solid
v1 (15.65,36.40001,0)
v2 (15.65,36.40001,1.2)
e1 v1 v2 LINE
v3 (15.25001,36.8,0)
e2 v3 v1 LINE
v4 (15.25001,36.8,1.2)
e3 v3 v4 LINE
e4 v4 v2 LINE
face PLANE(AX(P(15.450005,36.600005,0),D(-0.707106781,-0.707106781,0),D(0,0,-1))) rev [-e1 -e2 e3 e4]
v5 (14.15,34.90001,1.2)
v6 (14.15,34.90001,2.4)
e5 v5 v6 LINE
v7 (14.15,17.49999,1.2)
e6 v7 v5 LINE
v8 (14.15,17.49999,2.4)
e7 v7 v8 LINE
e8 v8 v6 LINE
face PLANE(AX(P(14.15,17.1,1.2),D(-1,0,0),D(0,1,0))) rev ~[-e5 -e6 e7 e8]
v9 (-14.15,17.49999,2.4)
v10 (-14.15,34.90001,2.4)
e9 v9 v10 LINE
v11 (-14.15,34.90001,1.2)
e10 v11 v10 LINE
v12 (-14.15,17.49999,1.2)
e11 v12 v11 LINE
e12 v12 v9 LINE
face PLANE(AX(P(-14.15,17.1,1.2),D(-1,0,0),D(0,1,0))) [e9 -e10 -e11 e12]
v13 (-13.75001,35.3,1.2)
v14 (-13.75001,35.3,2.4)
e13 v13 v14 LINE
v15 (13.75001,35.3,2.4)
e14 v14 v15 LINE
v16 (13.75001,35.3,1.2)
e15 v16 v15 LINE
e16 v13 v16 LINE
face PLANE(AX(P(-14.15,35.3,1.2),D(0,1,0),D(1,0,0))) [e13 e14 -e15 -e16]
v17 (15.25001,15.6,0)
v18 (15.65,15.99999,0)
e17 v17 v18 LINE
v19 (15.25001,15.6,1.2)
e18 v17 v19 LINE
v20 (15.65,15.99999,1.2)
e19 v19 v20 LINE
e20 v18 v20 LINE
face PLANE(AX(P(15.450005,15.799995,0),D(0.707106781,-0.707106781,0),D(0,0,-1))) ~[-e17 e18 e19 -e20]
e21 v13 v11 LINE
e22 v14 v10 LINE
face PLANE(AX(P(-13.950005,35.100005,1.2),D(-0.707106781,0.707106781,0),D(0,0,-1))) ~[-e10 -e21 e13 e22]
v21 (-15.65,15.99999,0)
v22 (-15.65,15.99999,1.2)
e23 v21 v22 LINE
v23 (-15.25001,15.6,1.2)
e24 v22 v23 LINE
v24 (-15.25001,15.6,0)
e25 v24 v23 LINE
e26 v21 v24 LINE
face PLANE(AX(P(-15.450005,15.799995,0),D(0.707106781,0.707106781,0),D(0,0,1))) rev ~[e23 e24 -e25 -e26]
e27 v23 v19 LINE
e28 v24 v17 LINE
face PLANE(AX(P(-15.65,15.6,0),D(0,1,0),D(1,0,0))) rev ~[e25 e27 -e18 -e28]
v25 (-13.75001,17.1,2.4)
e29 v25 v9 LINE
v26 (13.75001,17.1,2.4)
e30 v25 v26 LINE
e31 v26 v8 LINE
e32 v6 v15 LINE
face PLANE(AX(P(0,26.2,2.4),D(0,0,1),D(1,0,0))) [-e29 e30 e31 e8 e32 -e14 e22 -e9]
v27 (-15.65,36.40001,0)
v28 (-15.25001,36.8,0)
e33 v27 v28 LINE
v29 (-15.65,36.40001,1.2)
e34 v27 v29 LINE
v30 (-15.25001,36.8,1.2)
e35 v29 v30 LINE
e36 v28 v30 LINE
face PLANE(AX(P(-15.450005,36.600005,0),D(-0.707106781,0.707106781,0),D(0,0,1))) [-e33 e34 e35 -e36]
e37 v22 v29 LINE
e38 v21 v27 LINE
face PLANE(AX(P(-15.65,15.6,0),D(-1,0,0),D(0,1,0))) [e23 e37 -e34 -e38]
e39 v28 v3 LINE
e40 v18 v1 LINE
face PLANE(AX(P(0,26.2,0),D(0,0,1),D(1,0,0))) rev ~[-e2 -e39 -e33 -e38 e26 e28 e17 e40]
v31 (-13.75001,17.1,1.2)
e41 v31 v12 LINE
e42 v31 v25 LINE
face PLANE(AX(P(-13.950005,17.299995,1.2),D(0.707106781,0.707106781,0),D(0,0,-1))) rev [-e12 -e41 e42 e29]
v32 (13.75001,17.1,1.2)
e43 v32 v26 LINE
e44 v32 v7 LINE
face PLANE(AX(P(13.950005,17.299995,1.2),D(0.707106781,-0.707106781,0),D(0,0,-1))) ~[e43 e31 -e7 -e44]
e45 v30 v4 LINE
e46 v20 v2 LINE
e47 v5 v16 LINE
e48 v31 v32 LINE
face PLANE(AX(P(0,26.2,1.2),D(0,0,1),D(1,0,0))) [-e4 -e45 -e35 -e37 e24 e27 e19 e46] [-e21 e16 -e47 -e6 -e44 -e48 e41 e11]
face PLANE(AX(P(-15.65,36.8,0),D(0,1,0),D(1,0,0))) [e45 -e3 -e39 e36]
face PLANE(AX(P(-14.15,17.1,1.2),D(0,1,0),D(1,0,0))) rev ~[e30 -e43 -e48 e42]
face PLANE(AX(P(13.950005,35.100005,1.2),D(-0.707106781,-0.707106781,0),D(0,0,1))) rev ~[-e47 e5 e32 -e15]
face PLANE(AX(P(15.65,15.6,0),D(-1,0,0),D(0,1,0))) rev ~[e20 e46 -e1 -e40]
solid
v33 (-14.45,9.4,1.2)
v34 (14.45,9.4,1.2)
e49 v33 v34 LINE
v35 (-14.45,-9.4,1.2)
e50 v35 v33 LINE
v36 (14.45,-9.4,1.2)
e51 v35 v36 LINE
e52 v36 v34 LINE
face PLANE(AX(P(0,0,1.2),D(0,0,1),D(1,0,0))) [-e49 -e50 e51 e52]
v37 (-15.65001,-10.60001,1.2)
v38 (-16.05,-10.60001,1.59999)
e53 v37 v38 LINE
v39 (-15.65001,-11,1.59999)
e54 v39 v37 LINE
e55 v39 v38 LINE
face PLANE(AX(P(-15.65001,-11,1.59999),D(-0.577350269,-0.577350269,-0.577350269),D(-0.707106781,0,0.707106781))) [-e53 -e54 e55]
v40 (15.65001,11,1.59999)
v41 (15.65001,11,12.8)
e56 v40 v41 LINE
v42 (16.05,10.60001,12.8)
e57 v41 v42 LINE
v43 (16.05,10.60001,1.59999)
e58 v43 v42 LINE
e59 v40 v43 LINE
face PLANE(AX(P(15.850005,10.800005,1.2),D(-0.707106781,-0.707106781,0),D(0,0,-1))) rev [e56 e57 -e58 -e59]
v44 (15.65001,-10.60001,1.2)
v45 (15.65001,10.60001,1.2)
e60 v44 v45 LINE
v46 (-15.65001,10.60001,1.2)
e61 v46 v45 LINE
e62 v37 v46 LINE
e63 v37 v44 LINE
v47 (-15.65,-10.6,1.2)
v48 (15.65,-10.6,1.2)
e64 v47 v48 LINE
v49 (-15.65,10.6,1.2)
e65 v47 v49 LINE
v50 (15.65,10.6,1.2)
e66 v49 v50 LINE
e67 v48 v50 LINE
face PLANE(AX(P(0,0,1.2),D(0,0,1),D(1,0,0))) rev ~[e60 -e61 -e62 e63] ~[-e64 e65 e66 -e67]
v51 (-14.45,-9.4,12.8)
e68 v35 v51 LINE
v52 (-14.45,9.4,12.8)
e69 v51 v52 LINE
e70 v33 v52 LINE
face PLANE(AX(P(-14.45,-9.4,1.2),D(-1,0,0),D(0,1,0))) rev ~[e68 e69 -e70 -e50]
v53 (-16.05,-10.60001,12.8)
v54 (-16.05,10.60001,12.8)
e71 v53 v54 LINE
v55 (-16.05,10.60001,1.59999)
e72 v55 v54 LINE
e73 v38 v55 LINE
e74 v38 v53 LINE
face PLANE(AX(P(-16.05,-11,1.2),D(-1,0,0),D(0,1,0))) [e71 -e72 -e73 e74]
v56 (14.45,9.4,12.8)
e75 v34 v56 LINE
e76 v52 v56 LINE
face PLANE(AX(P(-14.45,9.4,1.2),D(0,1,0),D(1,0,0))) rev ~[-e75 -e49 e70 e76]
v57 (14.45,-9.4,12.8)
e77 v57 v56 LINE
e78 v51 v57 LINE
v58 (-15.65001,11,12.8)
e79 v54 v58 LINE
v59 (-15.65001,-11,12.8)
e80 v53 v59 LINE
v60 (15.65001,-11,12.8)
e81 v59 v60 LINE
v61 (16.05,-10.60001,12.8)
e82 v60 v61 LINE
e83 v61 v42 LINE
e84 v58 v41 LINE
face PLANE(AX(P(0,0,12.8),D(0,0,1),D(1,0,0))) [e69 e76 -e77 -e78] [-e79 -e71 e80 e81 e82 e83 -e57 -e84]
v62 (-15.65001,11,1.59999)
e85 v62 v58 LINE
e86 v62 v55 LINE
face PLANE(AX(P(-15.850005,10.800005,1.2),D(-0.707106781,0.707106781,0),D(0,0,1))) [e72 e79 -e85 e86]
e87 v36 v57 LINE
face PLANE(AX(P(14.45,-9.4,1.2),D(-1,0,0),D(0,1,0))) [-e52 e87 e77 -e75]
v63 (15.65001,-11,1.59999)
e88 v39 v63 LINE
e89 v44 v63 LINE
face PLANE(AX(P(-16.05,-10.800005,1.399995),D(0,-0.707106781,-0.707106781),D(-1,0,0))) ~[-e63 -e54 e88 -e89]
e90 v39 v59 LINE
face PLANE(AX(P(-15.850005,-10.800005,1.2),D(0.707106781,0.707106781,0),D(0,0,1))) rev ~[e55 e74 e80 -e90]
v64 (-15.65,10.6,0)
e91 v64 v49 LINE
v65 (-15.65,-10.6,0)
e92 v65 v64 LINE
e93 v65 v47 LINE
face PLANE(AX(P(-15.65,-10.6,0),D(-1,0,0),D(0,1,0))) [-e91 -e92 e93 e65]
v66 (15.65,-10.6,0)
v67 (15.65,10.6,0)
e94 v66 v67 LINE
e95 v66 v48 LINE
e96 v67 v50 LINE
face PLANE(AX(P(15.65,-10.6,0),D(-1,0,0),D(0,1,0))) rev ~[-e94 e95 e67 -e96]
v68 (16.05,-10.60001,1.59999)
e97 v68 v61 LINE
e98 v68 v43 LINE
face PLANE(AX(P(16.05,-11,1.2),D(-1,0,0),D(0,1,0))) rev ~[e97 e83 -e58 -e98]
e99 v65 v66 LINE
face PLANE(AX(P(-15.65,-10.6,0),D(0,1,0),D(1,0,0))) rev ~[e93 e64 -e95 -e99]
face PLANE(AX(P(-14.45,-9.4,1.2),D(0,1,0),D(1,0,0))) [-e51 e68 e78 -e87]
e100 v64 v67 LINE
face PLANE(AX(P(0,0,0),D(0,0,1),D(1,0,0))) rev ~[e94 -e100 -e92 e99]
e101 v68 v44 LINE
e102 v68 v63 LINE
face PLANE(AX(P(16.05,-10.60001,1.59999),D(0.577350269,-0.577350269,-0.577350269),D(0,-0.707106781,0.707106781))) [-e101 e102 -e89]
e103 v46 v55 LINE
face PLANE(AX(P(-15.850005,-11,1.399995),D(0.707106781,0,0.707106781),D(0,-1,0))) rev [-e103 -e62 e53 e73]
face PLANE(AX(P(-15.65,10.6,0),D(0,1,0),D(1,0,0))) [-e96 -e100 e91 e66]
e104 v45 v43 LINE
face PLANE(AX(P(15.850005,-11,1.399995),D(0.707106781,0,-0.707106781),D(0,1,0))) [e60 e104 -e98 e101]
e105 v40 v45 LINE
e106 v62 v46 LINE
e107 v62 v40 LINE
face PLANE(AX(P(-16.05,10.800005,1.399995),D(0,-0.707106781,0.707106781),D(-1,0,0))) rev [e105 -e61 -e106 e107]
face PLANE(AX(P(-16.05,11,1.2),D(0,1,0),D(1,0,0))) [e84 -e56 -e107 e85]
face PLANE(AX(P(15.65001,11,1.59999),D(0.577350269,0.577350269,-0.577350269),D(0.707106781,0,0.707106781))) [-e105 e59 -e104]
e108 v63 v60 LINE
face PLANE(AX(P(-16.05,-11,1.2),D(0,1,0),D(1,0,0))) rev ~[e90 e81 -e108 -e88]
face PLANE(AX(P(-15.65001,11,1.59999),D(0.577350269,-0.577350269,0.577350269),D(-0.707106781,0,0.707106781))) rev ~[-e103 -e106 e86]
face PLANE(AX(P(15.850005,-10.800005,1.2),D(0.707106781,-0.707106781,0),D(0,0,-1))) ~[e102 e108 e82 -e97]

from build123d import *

# Parameters (mm, degrees)
F0_W      = 31.3
F0_H      = 21.2
F1_DEPTH  = 1.2
F2_W      = 32.1
F2_H      = 22
F2_W_2    = 31.3
F2_H_2    = 21.2
F2_W_3    = 28.9
F2_H_3    = 18.8
F3_DEPTH  = 11.6
F4_W      = 28.3
F4_H      = 18.2
F5_DEPTH  = 1.2
F6_SIZE   = 0.39999
F6_2_SIZE = 0.39999


# Not quite as in the source:
# - a fillet or chamfer is up to 0.001 mm smaller than in the source, because OpenCascade refuses the exact size


with BuildPart() as f1:
    # F0 (on Top) → F1 (new body)
    with BuildSketch(Plane.XY):
        Rectangle(F0_W, F0_H)
    extrude(amount=F1_DEPTH)

    # F2 (on face) → F3 (join)
    with BuildSketch(Plane.XY.offset(1.2)):
        Rectangle(F2_W, F2_H)
        Rectangle(F2_W_2, F2_H_2, mode=Mode.SUBTRACT)
        Rectangle(F2_W_2, F2_H_2)
        Rectangle(F2_W_3, F2_H_3, mode=Mode.SUBTRACT)
    extrude(amount=F3_DEPTH)

    # F6 (size 0.4 in the source; OpenCascade refuses exactly that, so slightly less here)
    f6_edges = [f1.edges().sort_by_distance(p)[0] for p in [
        (-16.05, 0, 1.2),
        (0, -11, 1.2),
        (16.05, 0, 1.2),
        (0, 11, 1.2),
        (-16.05, -11, 7),
        (16.05, -11, 7),
        (16.05, 11, 7),
        (-16.05, 11, 7),
    ]]
    chamfer(f6_edges, length=F6_SIZE)


with BuildPart() as f1b:
    # F0 (on Top) → F1, piece 2 (new body)
    with BuildSketch(Plane.XY):
        with Locations((0, 26.2)):
            Rectangle(F0_W, F0_H)
    extrude(amount=F1_DEPTH)

    # F4 (on face) → F5 (join)
    with BuildSketch(Plane.XY.offset(1.2)):
        with Locations((0, 26.2)):
            Rectangle(F4_W, F4_H)
    extrude(amount=F5_DEPTH)

    # F6#2 (size 0.4 in the source; OpenCascade refuses exactly that, so slightly less here)
    f6_2_edges = [f1b.edges().sort_by_distance(p)[0] for p in [
        (15.65, 36.8, 0.6),
        (15.65, 15.6, 0.6),
        (-15.65, 36.8, 0.6),
        (-14.15, 35.3, 1.8),
        (14.15, 35.3, 1.8),
        (14.15, 17.1, 1.8),
        (-14.15, 17.1, 1.8),
        (-15.65, 15.6, 0.6),
    ]]
    chamfer(f6_2_edges, length=F6_2_SIZE)


solid = Compound([f1.part, f1b.part])
